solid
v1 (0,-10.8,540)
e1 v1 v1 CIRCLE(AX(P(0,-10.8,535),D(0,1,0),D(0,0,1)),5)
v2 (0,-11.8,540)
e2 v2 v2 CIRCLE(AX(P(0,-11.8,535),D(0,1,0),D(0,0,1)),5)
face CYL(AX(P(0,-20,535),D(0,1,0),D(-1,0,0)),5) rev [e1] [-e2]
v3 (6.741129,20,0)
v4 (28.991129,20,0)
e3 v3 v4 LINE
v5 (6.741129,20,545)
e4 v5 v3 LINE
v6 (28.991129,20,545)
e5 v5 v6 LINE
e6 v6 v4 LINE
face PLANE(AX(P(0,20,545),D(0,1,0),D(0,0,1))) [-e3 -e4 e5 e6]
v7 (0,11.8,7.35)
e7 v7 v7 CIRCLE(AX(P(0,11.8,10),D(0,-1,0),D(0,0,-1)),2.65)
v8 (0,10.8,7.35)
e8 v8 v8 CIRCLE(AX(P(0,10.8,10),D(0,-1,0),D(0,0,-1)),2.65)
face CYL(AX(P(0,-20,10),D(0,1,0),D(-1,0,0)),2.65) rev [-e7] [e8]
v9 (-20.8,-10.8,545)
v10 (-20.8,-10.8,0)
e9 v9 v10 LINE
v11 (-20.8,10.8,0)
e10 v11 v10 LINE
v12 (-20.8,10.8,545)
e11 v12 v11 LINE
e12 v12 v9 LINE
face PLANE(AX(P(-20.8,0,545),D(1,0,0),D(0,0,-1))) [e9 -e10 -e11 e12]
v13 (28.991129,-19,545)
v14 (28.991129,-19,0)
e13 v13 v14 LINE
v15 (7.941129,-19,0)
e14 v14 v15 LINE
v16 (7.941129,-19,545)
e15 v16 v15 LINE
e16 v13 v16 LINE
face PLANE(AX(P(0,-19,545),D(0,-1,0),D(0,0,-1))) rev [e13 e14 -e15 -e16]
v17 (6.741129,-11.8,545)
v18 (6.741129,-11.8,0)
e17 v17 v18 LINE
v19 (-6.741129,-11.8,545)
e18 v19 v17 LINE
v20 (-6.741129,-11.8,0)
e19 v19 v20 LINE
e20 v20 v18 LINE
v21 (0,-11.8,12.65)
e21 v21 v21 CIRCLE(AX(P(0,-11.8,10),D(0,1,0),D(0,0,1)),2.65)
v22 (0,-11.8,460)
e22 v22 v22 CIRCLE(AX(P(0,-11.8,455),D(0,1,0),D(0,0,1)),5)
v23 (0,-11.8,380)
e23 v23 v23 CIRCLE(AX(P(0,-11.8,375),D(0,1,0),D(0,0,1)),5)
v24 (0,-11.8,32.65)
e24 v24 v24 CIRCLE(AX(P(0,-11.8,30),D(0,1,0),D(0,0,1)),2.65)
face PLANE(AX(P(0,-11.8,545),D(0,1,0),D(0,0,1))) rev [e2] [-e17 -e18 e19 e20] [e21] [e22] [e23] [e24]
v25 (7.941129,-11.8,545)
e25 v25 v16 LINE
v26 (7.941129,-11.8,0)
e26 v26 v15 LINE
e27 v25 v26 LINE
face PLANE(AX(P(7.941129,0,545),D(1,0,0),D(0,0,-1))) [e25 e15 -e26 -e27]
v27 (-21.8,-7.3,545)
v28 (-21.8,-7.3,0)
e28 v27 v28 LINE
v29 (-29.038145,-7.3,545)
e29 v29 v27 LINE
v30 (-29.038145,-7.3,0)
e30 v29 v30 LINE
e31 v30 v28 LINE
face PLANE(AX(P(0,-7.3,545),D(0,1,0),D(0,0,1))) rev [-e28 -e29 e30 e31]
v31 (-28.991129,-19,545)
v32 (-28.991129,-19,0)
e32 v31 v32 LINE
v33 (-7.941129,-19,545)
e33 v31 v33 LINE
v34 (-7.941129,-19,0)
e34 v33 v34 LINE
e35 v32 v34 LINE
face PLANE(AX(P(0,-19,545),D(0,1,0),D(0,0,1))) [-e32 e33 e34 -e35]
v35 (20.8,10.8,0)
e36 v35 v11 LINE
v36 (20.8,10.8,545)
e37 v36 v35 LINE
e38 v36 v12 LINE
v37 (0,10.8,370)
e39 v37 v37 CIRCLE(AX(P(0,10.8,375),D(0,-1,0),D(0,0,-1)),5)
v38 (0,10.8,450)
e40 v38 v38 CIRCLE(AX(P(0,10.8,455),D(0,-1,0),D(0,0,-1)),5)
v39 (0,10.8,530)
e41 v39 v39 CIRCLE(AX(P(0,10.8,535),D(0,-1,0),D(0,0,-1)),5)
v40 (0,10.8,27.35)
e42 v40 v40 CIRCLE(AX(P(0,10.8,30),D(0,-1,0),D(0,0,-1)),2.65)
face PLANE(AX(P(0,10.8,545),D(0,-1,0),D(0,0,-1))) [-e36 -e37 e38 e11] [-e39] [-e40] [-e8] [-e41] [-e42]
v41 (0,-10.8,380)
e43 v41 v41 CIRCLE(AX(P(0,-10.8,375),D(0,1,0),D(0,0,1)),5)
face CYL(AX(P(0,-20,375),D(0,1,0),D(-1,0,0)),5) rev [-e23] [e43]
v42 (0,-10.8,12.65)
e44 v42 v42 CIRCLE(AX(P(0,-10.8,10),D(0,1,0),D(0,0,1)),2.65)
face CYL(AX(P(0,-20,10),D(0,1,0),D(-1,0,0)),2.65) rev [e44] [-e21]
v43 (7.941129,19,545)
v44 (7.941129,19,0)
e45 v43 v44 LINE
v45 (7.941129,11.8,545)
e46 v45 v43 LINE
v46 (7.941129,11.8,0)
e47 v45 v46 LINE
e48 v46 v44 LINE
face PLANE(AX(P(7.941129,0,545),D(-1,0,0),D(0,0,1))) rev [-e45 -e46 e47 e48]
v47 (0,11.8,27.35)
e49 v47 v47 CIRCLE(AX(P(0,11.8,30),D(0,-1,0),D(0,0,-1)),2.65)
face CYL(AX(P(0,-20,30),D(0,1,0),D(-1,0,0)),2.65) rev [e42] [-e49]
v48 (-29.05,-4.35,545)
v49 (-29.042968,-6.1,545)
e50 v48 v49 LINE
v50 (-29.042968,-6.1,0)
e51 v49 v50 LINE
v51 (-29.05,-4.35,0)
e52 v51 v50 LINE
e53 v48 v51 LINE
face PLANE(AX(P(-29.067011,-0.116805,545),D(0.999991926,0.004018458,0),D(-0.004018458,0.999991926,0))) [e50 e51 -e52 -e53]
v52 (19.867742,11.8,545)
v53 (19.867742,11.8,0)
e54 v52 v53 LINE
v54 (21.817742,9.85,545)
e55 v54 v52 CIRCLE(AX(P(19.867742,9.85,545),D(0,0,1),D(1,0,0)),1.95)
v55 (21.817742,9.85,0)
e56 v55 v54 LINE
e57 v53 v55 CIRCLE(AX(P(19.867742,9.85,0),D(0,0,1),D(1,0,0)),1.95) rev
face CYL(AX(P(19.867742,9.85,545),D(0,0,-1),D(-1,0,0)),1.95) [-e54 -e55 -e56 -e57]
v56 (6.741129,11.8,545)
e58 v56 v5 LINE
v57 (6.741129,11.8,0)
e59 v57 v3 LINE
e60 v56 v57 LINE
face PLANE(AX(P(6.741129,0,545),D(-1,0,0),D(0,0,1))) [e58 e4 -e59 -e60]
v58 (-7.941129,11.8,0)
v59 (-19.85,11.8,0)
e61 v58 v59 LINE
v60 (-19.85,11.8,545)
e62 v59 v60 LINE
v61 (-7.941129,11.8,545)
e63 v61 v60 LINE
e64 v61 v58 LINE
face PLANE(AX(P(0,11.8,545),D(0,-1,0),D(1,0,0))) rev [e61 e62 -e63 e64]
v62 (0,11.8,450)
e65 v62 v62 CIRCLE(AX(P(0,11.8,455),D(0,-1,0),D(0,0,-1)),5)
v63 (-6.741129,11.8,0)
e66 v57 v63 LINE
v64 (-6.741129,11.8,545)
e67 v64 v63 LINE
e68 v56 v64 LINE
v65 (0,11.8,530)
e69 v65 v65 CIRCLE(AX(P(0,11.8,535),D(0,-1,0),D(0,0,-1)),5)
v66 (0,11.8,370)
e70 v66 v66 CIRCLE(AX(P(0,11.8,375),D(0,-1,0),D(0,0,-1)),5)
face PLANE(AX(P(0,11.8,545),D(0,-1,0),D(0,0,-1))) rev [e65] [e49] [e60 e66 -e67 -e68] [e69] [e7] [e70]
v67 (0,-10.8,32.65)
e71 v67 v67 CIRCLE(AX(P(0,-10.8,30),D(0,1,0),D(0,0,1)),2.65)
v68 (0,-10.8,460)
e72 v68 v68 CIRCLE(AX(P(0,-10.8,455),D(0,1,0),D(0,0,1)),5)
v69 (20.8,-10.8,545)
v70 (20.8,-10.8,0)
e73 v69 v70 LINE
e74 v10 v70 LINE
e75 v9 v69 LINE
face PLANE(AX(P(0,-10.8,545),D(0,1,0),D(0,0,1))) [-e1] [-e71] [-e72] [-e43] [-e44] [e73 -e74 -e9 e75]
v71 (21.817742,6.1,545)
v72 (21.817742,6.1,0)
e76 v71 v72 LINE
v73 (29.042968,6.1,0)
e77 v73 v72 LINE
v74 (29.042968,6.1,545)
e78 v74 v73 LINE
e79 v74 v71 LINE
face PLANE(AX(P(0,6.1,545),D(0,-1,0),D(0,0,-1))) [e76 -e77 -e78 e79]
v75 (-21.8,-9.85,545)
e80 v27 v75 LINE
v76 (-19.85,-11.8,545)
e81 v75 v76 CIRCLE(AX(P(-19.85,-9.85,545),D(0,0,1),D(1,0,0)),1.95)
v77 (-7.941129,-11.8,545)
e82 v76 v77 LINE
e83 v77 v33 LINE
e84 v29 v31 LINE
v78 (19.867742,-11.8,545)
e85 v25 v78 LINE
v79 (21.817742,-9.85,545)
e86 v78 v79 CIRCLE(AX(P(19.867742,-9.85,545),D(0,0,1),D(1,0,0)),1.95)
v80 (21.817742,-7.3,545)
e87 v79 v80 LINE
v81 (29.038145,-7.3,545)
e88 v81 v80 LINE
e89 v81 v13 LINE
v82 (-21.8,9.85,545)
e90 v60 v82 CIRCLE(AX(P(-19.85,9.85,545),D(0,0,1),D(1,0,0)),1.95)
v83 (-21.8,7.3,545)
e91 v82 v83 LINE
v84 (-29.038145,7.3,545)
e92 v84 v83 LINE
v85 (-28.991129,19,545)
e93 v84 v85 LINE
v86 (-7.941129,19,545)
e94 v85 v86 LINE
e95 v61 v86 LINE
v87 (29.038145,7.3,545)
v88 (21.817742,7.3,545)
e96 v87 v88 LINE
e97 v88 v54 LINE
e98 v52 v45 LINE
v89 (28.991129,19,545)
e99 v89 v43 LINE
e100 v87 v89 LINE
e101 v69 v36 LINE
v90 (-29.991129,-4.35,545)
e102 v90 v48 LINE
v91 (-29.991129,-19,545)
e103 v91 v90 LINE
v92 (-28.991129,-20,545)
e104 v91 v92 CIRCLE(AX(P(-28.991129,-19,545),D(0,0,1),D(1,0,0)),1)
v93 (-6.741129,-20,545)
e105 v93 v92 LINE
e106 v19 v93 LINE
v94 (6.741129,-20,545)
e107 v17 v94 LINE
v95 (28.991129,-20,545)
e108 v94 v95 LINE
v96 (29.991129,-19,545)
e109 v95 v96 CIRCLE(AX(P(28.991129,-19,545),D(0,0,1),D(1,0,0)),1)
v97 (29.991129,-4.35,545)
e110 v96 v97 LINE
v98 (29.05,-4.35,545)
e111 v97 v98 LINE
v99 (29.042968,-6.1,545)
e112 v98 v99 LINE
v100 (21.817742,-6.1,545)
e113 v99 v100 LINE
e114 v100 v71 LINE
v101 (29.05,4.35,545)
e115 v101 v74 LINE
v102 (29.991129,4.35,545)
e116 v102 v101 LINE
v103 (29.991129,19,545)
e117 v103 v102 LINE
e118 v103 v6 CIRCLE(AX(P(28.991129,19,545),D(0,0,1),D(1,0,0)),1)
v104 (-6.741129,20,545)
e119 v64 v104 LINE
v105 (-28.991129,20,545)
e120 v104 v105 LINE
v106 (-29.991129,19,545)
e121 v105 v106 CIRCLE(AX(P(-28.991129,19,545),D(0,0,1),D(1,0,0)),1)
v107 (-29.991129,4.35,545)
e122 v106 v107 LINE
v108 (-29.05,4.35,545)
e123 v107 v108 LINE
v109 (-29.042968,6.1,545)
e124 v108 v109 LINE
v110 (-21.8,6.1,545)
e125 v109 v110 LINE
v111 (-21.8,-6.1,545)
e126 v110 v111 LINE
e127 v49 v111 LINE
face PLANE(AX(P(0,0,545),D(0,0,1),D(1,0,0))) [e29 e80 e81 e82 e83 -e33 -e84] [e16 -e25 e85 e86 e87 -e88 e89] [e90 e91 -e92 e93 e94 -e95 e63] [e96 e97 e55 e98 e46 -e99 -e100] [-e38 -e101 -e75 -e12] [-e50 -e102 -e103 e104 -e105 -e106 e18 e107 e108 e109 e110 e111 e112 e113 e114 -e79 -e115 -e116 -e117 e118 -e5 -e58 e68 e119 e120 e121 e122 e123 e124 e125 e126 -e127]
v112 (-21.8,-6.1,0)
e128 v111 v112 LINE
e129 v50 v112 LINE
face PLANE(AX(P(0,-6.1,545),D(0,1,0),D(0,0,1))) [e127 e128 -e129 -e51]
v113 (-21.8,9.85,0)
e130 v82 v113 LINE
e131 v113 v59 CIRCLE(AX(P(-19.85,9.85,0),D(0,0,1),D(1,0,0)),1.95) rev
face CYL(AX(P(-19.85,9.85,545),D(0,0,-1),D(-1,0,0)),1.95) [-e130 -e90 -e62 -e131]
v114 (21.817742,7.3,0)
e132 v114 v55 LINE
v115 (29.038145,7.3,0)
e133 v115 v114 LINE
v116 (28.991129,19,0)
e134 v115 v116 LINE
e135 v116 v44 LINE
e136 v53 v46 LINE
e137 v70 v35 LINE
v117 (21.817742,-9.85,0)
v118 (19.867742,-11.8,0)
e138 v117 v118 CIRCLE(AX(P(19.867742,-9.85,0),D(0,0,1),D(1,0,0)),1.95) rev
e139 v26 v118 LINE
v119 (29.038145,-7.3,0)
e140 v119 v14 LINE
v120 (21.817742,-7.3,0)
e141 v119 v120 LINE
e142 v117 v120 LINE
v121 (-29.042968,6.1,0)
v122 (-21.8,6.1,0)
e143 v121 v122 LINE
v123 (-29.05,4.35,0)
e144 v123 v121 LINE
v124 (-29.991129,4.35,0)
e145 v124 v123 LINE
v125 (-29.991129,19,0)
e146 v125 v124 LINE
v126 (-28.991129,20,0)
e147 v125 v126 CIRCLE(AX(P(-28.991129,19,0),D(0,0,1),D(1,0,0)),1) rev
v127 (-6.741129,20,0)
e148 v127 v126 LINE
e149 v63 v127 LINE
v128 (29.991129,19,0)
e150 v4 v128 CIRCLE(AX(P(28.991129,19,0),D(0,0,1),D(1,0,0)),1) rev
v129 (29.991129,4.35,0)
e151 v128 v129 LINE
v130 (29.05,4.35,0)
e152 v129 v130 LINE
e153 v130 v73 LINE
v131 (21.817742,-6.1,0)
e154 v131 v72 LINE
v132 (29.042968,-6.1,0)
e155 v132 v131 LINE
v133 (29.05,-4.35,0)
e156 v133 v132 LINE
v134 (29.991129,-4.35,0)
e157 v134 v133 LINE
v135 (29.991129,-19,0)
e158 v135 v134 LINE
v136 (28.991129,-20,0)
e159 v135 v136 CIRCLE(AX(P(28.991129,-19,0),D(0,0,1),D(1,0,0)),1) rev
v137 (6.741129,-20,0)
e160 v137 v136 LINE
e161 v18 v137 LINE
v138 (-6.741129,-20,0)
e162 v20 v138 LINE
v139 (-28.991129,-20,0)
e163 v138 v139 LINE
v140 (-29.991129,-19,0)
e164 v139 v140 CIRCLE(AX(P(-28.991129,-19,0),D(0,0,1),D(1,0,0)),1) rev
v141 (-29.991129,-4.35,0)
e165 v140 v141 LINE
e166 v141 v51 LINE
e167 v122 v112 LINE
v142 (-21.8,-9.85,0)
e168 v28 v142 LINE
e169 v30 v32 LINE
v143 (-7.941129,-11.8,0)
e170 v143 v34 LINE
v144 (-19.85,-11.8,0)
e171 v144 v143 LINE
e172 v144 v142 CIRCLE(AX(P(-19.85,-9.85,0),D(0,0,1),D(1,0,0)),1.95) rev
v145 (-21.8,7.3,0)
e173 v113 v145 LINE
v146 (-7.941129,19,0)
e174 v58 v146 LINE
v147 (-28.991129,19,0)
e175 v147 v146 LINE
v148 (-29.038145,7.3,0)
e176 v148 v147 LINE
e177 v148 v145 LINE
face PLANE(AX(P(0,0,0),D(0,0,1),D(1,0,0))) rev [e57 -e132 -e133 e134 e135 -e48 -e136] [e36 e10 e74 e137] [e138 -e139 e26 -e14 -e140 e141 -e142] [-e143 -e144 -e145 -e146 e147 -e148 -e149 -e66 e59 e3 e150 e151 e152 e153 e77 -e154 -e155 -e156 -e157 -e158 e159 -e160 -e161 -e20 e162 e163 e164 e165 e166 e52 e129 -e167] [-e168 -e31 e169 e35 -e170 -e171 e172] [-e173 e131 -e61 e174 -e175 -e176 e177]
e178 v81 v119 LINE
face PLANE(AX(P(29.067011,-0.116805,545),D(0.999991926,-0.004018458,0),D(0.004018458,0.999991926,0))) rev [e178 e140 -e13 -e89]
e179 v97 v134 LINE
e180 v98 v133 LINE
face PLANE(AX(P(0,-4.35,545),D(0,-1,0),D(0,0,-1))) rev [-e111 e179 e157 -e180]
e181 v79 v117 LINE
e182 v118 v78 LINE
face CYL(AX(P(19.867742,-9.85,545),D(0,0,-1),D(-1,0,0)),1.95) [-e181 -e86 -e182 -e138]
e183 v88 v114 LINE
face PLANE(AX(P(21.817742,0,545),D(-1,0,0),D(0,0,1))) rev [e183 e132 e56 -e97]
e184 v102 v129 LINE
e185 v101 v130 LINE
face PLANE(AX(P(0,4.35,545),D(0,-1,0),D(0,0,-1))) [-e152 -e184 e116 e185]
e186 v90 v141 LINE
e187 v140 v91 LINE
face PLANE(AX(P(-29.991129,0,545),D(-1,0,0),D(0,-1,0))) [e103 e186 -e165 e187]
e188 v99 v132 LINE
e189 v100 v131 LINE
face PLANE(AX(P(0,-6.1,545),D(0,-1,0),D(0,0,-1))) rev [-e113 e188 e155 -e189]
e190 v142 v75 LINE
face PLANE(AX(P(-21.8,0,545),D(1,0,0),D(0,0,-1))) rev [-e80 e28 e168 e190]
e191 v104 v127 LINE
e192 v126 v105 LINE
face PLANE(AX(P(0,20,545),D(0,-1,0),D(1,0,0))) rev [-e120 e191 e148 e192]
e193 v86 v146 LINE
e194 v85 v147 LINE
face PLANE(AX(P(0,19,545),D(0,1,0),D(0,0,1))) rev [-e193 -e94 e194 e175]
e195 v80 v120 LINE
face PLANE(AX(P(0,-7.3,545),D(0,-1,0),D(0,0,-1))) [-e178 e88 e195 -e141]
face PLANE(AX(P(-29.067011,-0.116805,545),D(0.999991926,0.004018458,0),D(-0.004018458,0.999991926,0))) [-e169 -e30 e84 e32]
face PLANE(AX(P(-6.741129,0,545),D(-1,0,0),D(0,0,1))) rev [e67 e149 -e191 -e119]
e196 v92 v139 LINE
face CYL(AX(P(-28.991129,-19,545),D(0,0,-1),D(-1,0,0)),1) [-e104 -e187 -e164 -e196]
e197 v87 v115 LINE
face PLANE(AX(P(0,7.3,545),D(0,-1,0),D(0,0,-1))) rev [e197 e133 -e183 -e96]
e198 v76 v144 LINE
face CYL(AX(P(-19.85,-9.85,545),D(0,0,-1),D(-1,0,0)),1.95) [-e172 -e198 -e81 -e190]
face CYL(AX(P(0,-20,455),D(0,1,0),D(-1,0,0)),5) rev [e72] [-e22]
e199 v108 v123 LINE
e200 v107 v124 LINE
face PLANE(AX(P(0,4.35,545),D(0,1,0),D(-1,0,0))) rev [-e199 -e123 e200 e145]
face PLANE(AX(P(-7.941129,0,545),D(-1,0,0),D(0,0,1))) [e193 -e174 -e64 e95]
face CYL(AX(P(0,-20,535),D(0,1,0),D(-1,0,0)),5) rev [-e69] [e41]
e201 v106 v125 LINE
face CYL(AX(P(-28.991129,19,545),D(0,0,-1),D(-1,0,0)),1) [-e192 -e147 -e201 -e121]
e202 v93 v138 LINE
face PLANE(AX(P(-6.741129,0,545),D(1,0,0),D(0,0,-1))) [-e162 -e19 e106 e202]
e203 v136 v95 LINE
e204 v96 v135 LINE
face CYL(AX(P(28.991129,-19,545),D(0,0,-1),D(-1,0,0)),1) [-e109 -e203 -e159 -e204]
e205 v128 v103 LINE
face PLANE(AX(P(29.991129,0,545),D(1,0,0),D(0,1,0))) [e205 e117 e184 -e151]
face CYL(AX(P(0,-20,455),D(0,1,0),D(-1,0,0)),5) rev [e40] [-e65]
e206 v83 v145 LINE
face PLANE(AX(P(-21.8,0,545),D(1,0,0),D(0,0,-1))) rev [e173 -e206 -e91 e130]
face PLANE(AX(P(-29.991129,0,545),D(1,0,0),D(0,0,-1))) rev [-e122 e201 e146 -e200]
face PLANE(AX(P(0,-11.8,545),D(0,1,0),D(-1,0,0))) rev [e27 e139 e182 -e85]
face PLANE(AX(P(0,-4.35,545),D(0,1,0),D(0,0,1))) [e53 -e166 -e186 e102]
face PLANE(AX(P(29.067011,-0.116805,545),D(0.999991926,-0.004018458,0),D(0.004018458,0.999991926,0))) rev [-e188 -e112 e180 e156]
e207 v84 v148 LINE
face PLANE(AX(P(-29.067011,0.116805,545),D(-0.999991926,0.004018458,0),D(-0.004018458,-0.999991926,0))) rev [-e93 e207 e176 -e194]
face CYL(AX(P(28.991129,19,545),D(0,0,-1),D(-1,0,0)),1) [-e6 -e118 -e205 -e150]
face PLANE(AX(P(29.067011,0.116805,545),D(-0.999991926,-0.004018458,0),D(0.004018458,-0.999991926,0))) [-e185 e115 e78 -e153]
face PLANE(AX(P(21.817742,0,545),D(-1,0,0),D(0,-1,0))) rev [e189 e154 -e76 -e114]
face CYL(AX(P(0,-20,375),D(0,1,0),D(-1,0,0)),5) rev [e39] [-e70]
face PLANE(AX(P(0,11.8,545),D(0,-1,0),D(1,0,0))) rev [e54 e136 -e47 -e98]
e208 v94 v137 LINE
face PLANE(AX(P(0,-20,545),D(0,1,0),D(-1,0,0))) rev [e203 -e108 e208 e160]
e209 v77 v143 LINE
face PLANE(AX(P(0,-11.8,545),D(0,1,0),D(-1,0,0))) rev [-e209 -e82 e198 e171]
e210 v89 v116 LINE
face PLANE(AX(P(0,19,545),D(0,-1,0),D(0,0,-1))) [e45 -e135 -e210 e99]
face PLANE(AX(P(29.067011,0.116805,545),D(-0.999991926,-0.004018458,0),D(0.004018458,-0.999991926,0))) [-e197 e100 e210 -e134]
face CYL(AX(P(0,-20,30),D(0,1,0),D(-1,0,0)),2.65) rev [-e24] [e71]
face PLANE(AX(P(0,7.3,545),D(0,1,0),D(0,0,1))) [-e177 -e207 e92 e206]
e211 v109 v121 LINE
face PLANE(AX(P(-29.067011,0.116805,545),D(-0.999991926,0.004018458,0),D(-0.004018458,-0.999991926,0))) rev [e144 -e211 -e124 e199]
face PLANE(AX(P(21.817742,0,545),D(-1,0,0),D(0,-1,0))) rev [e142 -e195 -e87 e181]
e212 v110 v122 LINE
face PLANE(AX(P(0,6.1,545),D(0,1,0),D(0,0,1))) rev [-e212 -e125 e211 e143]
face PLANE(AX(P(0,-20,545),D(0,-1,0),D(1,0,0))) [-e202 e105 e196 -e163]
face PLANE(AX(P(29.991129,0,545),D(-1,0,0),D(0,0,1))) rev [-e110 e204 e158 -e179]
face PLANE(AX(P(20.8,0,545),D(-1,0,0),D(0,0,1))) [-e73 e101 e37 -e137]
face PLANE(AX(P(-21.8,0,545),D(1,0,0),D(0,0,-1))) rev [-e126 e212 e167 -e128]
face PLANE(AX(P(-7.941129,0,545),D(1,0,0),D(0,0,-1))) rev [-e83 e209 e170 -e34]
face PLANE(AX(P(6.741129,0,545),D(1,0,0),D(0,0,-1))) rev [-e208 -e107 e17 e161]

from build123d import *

# Parameters (mm, degrees)
EXTRUDE_1_DEPTH     = 545
FILLET_1_R          = 1
FILLET_2_R          = 1.95
SKETCH_3_R          = 5
CUT_EXTRUDE_1_DEPTH = 548.288285847


with BuildPart() as part:
    # 草图2 → 凸台-拉伸1 (new body)
    with BuildSketch(Plane.XY):
        Polygon((-29.99112912, -4.35), (-29.99112912, -19), (-29.99112912, -20), (-29, -20), (-6.74112912, -20), (-6.74112912, -19), (-6.74112912, -11.8), (6.74112912, -11.8), (6.74112912, -19), (6.74112912, -20), (29, -20), (29.99112912, -20), (29.99112912, -19), (29.99112912, -4.35), (29.05, -4.35), (29.042967642, -6.1), (21.81774176, -6.1), (21.81774176, 6.1), (29.042967642, 6.1), (29.05, 4.35), (29.99112912, 4.35), (29.99112912, 19), (29.99112912, 20), (29, 20), (6.74112912, 20), (6.74112912, 19), (6.74112912, 11.8), (0.00887088, 11.8), (-6.74112912, 11.8), (-6.74112912, 19), (-6.74112912, 20), (-29, 20), (-29.99112912, 20), (-29.99112912, 19), (-29.99112912, 4.35), (-29.05, 4.35), (-29.042967642, 6.1), (-21.8, 6.1), (-21.8, -6.1), (-29.042967642, -6.1), (-29.05, -4.35), align=None)
        Polygon((-21.8, -7.3), (-21.8, -11.8), (-7.94112912, -11.8), (-7.94112912, -19), (-28.99112912, -19), (-29.038145454, -7.3), align=None, mode=Mode.SUBTRACT)
        Polygon((7.94112912, -11.8), (21.81774176, -11.8), (21.81774176, -7.3), (29.038145454, -7.3), (28.99112912, -19), (7.94112912, -19), align=None, mode=Mode.SUBTRACT)
        Polygon((-7.94112912, 11.8), (-21.8, 11.8), (-21.8, 7.3), (-29.038145454, 7.3), (-28.99112912, 19), (-7.94112912, 19), align=None, mode=Mode.SUBTRACT)
        Polygon((-20.8, 10.8), (0, 10.8), (20.8, 10.8), (20.8, -10.8), (-20.8, -10.8), align=None, mode=Mode.SUBTRACT)
        Polygon((21.81774176, 7.3), (21.81774176, 11.8), (7.94112912, 11.8), (7.94112912, 19), (28.99112912, 19), (29.038145454, 7.3), align=None, mode=Mode.SUBTRACT)
    extrude(amount=EXTRUDE_1_DEPTH)

    # 圆角1
    fillet_1_edges = [part.edges().sort_by_distance(p)[0] for p in [
        (29.99112912, -20, 272.5),
        (-29.99112912, 20, 272.5),
        (-29.99112912, -20, 272.5),
        (29.99112912, 20, 272.5),
    ]]
    fillet(fillet_1_edges, radius=FILLET_1_R)

    # 圆角2
    fillet_2_edges = [part.edges().sort_by_distance(p)[0] for p in [
        (-21.8, -11.8, 272.5),
        (21.81774176, -11.8, 272.5),
        (21.81774176, 11.8, 272.5),
        (-21.8, 11.8, 272.5),
    ]]
    fillet(fillet_2_edges, radius=FILLET_2_R)

    # 草图3 → 切除-拉伸1 (cut, through all)
    with BuildSketch(Plane(origin=(0, 20, 0), x_dir=(1, 0, 0), z_dir=(0, 1, 0))):
        with BuildLine():
            ThreePointArc((2.65, -10), (1.87383297, -8.12616703), (0, -7.35))
            Line((0, -7.35), (0, -10))
            Line((0, -10), (0, -12.65))
            ThreePointArc((0, -12.65), (1.87383297, -11.87383297), (2.65, -10))
        make_face()
        with BuildLine():
            Line((0, -10), (0, -7.35))
            ThreePointArc((0, -7.35), (-2.65, -10), (0, -12.65))
            Line((0, -12.65), (0, -10))
        make_face()
        with BuildLine():
            ThreePointArc((2.65, -30), (1.87383297, -28.12616703), (0, -27.35))
            Line((0, -27.35), (0, -30))
            Line((0, -30), (0, -32.65))
            ThreePointArc((0, -32.65), (1.87383297, -31.87383297), (2.65, -30))
        make_face()
        with BuildLine():
            Line((0, -30), (0, -27.35))
            ThreePointArc((0, -27.35), (-2.65, -30), (0, -32.65))
            Line((0, -32.65), (0, -30))
        make_face()
        with BuildLine():
            ThreePointArc((2.65, -30), (1.87383297, -28.12616703), (0, -27.35))
            Line((0, -27.35), (0, -30))
            Line((0, -30), (0, -32.65))
            ThreePointArc((0, -32.65), (1.87383297, -31.87383297), (2.65, -30))
        make_face()
        with BuildLine():
            Line((0, -30), (0, -27.35))
            ThreePointArc((0, -27.35), (-2.65, -30), (0, -32.65))
            Line((0, -32.65), (0, -30))
        make_face()
        with BuildLine():
            ThreePointArc((2.65, -10), (1.87383297, -8.12616703), (0, -7.35))
            Line((0, -7.35), (0, -10))
            Line((0, -10), (0, -12.65))
            ThreePointArc((0, -12.65), (1.87383297, -11.87383297), (2.65, -10))
        make_face()
        with BuildLine():
            Line((0, -10), (0, -7.35))
            ThreePointArc((0, -7.35), (-2.65, -10), (0, -12.65))
            Line((0, -12.65), (0, -10))
        make_face()
        with Locations((0, -535)):
            Circle(SKETCH_3_R)
        with Locations((0, -455)):
            Circle(SKETCH_3_R)
        with Locations((0, -375)):
            Circle(SKETCH_3_R)
    extrude(amount=-CUT_EXTRUDE_1_DEPTH, mode=Mode.SUBTRACT)


solid = part.part
